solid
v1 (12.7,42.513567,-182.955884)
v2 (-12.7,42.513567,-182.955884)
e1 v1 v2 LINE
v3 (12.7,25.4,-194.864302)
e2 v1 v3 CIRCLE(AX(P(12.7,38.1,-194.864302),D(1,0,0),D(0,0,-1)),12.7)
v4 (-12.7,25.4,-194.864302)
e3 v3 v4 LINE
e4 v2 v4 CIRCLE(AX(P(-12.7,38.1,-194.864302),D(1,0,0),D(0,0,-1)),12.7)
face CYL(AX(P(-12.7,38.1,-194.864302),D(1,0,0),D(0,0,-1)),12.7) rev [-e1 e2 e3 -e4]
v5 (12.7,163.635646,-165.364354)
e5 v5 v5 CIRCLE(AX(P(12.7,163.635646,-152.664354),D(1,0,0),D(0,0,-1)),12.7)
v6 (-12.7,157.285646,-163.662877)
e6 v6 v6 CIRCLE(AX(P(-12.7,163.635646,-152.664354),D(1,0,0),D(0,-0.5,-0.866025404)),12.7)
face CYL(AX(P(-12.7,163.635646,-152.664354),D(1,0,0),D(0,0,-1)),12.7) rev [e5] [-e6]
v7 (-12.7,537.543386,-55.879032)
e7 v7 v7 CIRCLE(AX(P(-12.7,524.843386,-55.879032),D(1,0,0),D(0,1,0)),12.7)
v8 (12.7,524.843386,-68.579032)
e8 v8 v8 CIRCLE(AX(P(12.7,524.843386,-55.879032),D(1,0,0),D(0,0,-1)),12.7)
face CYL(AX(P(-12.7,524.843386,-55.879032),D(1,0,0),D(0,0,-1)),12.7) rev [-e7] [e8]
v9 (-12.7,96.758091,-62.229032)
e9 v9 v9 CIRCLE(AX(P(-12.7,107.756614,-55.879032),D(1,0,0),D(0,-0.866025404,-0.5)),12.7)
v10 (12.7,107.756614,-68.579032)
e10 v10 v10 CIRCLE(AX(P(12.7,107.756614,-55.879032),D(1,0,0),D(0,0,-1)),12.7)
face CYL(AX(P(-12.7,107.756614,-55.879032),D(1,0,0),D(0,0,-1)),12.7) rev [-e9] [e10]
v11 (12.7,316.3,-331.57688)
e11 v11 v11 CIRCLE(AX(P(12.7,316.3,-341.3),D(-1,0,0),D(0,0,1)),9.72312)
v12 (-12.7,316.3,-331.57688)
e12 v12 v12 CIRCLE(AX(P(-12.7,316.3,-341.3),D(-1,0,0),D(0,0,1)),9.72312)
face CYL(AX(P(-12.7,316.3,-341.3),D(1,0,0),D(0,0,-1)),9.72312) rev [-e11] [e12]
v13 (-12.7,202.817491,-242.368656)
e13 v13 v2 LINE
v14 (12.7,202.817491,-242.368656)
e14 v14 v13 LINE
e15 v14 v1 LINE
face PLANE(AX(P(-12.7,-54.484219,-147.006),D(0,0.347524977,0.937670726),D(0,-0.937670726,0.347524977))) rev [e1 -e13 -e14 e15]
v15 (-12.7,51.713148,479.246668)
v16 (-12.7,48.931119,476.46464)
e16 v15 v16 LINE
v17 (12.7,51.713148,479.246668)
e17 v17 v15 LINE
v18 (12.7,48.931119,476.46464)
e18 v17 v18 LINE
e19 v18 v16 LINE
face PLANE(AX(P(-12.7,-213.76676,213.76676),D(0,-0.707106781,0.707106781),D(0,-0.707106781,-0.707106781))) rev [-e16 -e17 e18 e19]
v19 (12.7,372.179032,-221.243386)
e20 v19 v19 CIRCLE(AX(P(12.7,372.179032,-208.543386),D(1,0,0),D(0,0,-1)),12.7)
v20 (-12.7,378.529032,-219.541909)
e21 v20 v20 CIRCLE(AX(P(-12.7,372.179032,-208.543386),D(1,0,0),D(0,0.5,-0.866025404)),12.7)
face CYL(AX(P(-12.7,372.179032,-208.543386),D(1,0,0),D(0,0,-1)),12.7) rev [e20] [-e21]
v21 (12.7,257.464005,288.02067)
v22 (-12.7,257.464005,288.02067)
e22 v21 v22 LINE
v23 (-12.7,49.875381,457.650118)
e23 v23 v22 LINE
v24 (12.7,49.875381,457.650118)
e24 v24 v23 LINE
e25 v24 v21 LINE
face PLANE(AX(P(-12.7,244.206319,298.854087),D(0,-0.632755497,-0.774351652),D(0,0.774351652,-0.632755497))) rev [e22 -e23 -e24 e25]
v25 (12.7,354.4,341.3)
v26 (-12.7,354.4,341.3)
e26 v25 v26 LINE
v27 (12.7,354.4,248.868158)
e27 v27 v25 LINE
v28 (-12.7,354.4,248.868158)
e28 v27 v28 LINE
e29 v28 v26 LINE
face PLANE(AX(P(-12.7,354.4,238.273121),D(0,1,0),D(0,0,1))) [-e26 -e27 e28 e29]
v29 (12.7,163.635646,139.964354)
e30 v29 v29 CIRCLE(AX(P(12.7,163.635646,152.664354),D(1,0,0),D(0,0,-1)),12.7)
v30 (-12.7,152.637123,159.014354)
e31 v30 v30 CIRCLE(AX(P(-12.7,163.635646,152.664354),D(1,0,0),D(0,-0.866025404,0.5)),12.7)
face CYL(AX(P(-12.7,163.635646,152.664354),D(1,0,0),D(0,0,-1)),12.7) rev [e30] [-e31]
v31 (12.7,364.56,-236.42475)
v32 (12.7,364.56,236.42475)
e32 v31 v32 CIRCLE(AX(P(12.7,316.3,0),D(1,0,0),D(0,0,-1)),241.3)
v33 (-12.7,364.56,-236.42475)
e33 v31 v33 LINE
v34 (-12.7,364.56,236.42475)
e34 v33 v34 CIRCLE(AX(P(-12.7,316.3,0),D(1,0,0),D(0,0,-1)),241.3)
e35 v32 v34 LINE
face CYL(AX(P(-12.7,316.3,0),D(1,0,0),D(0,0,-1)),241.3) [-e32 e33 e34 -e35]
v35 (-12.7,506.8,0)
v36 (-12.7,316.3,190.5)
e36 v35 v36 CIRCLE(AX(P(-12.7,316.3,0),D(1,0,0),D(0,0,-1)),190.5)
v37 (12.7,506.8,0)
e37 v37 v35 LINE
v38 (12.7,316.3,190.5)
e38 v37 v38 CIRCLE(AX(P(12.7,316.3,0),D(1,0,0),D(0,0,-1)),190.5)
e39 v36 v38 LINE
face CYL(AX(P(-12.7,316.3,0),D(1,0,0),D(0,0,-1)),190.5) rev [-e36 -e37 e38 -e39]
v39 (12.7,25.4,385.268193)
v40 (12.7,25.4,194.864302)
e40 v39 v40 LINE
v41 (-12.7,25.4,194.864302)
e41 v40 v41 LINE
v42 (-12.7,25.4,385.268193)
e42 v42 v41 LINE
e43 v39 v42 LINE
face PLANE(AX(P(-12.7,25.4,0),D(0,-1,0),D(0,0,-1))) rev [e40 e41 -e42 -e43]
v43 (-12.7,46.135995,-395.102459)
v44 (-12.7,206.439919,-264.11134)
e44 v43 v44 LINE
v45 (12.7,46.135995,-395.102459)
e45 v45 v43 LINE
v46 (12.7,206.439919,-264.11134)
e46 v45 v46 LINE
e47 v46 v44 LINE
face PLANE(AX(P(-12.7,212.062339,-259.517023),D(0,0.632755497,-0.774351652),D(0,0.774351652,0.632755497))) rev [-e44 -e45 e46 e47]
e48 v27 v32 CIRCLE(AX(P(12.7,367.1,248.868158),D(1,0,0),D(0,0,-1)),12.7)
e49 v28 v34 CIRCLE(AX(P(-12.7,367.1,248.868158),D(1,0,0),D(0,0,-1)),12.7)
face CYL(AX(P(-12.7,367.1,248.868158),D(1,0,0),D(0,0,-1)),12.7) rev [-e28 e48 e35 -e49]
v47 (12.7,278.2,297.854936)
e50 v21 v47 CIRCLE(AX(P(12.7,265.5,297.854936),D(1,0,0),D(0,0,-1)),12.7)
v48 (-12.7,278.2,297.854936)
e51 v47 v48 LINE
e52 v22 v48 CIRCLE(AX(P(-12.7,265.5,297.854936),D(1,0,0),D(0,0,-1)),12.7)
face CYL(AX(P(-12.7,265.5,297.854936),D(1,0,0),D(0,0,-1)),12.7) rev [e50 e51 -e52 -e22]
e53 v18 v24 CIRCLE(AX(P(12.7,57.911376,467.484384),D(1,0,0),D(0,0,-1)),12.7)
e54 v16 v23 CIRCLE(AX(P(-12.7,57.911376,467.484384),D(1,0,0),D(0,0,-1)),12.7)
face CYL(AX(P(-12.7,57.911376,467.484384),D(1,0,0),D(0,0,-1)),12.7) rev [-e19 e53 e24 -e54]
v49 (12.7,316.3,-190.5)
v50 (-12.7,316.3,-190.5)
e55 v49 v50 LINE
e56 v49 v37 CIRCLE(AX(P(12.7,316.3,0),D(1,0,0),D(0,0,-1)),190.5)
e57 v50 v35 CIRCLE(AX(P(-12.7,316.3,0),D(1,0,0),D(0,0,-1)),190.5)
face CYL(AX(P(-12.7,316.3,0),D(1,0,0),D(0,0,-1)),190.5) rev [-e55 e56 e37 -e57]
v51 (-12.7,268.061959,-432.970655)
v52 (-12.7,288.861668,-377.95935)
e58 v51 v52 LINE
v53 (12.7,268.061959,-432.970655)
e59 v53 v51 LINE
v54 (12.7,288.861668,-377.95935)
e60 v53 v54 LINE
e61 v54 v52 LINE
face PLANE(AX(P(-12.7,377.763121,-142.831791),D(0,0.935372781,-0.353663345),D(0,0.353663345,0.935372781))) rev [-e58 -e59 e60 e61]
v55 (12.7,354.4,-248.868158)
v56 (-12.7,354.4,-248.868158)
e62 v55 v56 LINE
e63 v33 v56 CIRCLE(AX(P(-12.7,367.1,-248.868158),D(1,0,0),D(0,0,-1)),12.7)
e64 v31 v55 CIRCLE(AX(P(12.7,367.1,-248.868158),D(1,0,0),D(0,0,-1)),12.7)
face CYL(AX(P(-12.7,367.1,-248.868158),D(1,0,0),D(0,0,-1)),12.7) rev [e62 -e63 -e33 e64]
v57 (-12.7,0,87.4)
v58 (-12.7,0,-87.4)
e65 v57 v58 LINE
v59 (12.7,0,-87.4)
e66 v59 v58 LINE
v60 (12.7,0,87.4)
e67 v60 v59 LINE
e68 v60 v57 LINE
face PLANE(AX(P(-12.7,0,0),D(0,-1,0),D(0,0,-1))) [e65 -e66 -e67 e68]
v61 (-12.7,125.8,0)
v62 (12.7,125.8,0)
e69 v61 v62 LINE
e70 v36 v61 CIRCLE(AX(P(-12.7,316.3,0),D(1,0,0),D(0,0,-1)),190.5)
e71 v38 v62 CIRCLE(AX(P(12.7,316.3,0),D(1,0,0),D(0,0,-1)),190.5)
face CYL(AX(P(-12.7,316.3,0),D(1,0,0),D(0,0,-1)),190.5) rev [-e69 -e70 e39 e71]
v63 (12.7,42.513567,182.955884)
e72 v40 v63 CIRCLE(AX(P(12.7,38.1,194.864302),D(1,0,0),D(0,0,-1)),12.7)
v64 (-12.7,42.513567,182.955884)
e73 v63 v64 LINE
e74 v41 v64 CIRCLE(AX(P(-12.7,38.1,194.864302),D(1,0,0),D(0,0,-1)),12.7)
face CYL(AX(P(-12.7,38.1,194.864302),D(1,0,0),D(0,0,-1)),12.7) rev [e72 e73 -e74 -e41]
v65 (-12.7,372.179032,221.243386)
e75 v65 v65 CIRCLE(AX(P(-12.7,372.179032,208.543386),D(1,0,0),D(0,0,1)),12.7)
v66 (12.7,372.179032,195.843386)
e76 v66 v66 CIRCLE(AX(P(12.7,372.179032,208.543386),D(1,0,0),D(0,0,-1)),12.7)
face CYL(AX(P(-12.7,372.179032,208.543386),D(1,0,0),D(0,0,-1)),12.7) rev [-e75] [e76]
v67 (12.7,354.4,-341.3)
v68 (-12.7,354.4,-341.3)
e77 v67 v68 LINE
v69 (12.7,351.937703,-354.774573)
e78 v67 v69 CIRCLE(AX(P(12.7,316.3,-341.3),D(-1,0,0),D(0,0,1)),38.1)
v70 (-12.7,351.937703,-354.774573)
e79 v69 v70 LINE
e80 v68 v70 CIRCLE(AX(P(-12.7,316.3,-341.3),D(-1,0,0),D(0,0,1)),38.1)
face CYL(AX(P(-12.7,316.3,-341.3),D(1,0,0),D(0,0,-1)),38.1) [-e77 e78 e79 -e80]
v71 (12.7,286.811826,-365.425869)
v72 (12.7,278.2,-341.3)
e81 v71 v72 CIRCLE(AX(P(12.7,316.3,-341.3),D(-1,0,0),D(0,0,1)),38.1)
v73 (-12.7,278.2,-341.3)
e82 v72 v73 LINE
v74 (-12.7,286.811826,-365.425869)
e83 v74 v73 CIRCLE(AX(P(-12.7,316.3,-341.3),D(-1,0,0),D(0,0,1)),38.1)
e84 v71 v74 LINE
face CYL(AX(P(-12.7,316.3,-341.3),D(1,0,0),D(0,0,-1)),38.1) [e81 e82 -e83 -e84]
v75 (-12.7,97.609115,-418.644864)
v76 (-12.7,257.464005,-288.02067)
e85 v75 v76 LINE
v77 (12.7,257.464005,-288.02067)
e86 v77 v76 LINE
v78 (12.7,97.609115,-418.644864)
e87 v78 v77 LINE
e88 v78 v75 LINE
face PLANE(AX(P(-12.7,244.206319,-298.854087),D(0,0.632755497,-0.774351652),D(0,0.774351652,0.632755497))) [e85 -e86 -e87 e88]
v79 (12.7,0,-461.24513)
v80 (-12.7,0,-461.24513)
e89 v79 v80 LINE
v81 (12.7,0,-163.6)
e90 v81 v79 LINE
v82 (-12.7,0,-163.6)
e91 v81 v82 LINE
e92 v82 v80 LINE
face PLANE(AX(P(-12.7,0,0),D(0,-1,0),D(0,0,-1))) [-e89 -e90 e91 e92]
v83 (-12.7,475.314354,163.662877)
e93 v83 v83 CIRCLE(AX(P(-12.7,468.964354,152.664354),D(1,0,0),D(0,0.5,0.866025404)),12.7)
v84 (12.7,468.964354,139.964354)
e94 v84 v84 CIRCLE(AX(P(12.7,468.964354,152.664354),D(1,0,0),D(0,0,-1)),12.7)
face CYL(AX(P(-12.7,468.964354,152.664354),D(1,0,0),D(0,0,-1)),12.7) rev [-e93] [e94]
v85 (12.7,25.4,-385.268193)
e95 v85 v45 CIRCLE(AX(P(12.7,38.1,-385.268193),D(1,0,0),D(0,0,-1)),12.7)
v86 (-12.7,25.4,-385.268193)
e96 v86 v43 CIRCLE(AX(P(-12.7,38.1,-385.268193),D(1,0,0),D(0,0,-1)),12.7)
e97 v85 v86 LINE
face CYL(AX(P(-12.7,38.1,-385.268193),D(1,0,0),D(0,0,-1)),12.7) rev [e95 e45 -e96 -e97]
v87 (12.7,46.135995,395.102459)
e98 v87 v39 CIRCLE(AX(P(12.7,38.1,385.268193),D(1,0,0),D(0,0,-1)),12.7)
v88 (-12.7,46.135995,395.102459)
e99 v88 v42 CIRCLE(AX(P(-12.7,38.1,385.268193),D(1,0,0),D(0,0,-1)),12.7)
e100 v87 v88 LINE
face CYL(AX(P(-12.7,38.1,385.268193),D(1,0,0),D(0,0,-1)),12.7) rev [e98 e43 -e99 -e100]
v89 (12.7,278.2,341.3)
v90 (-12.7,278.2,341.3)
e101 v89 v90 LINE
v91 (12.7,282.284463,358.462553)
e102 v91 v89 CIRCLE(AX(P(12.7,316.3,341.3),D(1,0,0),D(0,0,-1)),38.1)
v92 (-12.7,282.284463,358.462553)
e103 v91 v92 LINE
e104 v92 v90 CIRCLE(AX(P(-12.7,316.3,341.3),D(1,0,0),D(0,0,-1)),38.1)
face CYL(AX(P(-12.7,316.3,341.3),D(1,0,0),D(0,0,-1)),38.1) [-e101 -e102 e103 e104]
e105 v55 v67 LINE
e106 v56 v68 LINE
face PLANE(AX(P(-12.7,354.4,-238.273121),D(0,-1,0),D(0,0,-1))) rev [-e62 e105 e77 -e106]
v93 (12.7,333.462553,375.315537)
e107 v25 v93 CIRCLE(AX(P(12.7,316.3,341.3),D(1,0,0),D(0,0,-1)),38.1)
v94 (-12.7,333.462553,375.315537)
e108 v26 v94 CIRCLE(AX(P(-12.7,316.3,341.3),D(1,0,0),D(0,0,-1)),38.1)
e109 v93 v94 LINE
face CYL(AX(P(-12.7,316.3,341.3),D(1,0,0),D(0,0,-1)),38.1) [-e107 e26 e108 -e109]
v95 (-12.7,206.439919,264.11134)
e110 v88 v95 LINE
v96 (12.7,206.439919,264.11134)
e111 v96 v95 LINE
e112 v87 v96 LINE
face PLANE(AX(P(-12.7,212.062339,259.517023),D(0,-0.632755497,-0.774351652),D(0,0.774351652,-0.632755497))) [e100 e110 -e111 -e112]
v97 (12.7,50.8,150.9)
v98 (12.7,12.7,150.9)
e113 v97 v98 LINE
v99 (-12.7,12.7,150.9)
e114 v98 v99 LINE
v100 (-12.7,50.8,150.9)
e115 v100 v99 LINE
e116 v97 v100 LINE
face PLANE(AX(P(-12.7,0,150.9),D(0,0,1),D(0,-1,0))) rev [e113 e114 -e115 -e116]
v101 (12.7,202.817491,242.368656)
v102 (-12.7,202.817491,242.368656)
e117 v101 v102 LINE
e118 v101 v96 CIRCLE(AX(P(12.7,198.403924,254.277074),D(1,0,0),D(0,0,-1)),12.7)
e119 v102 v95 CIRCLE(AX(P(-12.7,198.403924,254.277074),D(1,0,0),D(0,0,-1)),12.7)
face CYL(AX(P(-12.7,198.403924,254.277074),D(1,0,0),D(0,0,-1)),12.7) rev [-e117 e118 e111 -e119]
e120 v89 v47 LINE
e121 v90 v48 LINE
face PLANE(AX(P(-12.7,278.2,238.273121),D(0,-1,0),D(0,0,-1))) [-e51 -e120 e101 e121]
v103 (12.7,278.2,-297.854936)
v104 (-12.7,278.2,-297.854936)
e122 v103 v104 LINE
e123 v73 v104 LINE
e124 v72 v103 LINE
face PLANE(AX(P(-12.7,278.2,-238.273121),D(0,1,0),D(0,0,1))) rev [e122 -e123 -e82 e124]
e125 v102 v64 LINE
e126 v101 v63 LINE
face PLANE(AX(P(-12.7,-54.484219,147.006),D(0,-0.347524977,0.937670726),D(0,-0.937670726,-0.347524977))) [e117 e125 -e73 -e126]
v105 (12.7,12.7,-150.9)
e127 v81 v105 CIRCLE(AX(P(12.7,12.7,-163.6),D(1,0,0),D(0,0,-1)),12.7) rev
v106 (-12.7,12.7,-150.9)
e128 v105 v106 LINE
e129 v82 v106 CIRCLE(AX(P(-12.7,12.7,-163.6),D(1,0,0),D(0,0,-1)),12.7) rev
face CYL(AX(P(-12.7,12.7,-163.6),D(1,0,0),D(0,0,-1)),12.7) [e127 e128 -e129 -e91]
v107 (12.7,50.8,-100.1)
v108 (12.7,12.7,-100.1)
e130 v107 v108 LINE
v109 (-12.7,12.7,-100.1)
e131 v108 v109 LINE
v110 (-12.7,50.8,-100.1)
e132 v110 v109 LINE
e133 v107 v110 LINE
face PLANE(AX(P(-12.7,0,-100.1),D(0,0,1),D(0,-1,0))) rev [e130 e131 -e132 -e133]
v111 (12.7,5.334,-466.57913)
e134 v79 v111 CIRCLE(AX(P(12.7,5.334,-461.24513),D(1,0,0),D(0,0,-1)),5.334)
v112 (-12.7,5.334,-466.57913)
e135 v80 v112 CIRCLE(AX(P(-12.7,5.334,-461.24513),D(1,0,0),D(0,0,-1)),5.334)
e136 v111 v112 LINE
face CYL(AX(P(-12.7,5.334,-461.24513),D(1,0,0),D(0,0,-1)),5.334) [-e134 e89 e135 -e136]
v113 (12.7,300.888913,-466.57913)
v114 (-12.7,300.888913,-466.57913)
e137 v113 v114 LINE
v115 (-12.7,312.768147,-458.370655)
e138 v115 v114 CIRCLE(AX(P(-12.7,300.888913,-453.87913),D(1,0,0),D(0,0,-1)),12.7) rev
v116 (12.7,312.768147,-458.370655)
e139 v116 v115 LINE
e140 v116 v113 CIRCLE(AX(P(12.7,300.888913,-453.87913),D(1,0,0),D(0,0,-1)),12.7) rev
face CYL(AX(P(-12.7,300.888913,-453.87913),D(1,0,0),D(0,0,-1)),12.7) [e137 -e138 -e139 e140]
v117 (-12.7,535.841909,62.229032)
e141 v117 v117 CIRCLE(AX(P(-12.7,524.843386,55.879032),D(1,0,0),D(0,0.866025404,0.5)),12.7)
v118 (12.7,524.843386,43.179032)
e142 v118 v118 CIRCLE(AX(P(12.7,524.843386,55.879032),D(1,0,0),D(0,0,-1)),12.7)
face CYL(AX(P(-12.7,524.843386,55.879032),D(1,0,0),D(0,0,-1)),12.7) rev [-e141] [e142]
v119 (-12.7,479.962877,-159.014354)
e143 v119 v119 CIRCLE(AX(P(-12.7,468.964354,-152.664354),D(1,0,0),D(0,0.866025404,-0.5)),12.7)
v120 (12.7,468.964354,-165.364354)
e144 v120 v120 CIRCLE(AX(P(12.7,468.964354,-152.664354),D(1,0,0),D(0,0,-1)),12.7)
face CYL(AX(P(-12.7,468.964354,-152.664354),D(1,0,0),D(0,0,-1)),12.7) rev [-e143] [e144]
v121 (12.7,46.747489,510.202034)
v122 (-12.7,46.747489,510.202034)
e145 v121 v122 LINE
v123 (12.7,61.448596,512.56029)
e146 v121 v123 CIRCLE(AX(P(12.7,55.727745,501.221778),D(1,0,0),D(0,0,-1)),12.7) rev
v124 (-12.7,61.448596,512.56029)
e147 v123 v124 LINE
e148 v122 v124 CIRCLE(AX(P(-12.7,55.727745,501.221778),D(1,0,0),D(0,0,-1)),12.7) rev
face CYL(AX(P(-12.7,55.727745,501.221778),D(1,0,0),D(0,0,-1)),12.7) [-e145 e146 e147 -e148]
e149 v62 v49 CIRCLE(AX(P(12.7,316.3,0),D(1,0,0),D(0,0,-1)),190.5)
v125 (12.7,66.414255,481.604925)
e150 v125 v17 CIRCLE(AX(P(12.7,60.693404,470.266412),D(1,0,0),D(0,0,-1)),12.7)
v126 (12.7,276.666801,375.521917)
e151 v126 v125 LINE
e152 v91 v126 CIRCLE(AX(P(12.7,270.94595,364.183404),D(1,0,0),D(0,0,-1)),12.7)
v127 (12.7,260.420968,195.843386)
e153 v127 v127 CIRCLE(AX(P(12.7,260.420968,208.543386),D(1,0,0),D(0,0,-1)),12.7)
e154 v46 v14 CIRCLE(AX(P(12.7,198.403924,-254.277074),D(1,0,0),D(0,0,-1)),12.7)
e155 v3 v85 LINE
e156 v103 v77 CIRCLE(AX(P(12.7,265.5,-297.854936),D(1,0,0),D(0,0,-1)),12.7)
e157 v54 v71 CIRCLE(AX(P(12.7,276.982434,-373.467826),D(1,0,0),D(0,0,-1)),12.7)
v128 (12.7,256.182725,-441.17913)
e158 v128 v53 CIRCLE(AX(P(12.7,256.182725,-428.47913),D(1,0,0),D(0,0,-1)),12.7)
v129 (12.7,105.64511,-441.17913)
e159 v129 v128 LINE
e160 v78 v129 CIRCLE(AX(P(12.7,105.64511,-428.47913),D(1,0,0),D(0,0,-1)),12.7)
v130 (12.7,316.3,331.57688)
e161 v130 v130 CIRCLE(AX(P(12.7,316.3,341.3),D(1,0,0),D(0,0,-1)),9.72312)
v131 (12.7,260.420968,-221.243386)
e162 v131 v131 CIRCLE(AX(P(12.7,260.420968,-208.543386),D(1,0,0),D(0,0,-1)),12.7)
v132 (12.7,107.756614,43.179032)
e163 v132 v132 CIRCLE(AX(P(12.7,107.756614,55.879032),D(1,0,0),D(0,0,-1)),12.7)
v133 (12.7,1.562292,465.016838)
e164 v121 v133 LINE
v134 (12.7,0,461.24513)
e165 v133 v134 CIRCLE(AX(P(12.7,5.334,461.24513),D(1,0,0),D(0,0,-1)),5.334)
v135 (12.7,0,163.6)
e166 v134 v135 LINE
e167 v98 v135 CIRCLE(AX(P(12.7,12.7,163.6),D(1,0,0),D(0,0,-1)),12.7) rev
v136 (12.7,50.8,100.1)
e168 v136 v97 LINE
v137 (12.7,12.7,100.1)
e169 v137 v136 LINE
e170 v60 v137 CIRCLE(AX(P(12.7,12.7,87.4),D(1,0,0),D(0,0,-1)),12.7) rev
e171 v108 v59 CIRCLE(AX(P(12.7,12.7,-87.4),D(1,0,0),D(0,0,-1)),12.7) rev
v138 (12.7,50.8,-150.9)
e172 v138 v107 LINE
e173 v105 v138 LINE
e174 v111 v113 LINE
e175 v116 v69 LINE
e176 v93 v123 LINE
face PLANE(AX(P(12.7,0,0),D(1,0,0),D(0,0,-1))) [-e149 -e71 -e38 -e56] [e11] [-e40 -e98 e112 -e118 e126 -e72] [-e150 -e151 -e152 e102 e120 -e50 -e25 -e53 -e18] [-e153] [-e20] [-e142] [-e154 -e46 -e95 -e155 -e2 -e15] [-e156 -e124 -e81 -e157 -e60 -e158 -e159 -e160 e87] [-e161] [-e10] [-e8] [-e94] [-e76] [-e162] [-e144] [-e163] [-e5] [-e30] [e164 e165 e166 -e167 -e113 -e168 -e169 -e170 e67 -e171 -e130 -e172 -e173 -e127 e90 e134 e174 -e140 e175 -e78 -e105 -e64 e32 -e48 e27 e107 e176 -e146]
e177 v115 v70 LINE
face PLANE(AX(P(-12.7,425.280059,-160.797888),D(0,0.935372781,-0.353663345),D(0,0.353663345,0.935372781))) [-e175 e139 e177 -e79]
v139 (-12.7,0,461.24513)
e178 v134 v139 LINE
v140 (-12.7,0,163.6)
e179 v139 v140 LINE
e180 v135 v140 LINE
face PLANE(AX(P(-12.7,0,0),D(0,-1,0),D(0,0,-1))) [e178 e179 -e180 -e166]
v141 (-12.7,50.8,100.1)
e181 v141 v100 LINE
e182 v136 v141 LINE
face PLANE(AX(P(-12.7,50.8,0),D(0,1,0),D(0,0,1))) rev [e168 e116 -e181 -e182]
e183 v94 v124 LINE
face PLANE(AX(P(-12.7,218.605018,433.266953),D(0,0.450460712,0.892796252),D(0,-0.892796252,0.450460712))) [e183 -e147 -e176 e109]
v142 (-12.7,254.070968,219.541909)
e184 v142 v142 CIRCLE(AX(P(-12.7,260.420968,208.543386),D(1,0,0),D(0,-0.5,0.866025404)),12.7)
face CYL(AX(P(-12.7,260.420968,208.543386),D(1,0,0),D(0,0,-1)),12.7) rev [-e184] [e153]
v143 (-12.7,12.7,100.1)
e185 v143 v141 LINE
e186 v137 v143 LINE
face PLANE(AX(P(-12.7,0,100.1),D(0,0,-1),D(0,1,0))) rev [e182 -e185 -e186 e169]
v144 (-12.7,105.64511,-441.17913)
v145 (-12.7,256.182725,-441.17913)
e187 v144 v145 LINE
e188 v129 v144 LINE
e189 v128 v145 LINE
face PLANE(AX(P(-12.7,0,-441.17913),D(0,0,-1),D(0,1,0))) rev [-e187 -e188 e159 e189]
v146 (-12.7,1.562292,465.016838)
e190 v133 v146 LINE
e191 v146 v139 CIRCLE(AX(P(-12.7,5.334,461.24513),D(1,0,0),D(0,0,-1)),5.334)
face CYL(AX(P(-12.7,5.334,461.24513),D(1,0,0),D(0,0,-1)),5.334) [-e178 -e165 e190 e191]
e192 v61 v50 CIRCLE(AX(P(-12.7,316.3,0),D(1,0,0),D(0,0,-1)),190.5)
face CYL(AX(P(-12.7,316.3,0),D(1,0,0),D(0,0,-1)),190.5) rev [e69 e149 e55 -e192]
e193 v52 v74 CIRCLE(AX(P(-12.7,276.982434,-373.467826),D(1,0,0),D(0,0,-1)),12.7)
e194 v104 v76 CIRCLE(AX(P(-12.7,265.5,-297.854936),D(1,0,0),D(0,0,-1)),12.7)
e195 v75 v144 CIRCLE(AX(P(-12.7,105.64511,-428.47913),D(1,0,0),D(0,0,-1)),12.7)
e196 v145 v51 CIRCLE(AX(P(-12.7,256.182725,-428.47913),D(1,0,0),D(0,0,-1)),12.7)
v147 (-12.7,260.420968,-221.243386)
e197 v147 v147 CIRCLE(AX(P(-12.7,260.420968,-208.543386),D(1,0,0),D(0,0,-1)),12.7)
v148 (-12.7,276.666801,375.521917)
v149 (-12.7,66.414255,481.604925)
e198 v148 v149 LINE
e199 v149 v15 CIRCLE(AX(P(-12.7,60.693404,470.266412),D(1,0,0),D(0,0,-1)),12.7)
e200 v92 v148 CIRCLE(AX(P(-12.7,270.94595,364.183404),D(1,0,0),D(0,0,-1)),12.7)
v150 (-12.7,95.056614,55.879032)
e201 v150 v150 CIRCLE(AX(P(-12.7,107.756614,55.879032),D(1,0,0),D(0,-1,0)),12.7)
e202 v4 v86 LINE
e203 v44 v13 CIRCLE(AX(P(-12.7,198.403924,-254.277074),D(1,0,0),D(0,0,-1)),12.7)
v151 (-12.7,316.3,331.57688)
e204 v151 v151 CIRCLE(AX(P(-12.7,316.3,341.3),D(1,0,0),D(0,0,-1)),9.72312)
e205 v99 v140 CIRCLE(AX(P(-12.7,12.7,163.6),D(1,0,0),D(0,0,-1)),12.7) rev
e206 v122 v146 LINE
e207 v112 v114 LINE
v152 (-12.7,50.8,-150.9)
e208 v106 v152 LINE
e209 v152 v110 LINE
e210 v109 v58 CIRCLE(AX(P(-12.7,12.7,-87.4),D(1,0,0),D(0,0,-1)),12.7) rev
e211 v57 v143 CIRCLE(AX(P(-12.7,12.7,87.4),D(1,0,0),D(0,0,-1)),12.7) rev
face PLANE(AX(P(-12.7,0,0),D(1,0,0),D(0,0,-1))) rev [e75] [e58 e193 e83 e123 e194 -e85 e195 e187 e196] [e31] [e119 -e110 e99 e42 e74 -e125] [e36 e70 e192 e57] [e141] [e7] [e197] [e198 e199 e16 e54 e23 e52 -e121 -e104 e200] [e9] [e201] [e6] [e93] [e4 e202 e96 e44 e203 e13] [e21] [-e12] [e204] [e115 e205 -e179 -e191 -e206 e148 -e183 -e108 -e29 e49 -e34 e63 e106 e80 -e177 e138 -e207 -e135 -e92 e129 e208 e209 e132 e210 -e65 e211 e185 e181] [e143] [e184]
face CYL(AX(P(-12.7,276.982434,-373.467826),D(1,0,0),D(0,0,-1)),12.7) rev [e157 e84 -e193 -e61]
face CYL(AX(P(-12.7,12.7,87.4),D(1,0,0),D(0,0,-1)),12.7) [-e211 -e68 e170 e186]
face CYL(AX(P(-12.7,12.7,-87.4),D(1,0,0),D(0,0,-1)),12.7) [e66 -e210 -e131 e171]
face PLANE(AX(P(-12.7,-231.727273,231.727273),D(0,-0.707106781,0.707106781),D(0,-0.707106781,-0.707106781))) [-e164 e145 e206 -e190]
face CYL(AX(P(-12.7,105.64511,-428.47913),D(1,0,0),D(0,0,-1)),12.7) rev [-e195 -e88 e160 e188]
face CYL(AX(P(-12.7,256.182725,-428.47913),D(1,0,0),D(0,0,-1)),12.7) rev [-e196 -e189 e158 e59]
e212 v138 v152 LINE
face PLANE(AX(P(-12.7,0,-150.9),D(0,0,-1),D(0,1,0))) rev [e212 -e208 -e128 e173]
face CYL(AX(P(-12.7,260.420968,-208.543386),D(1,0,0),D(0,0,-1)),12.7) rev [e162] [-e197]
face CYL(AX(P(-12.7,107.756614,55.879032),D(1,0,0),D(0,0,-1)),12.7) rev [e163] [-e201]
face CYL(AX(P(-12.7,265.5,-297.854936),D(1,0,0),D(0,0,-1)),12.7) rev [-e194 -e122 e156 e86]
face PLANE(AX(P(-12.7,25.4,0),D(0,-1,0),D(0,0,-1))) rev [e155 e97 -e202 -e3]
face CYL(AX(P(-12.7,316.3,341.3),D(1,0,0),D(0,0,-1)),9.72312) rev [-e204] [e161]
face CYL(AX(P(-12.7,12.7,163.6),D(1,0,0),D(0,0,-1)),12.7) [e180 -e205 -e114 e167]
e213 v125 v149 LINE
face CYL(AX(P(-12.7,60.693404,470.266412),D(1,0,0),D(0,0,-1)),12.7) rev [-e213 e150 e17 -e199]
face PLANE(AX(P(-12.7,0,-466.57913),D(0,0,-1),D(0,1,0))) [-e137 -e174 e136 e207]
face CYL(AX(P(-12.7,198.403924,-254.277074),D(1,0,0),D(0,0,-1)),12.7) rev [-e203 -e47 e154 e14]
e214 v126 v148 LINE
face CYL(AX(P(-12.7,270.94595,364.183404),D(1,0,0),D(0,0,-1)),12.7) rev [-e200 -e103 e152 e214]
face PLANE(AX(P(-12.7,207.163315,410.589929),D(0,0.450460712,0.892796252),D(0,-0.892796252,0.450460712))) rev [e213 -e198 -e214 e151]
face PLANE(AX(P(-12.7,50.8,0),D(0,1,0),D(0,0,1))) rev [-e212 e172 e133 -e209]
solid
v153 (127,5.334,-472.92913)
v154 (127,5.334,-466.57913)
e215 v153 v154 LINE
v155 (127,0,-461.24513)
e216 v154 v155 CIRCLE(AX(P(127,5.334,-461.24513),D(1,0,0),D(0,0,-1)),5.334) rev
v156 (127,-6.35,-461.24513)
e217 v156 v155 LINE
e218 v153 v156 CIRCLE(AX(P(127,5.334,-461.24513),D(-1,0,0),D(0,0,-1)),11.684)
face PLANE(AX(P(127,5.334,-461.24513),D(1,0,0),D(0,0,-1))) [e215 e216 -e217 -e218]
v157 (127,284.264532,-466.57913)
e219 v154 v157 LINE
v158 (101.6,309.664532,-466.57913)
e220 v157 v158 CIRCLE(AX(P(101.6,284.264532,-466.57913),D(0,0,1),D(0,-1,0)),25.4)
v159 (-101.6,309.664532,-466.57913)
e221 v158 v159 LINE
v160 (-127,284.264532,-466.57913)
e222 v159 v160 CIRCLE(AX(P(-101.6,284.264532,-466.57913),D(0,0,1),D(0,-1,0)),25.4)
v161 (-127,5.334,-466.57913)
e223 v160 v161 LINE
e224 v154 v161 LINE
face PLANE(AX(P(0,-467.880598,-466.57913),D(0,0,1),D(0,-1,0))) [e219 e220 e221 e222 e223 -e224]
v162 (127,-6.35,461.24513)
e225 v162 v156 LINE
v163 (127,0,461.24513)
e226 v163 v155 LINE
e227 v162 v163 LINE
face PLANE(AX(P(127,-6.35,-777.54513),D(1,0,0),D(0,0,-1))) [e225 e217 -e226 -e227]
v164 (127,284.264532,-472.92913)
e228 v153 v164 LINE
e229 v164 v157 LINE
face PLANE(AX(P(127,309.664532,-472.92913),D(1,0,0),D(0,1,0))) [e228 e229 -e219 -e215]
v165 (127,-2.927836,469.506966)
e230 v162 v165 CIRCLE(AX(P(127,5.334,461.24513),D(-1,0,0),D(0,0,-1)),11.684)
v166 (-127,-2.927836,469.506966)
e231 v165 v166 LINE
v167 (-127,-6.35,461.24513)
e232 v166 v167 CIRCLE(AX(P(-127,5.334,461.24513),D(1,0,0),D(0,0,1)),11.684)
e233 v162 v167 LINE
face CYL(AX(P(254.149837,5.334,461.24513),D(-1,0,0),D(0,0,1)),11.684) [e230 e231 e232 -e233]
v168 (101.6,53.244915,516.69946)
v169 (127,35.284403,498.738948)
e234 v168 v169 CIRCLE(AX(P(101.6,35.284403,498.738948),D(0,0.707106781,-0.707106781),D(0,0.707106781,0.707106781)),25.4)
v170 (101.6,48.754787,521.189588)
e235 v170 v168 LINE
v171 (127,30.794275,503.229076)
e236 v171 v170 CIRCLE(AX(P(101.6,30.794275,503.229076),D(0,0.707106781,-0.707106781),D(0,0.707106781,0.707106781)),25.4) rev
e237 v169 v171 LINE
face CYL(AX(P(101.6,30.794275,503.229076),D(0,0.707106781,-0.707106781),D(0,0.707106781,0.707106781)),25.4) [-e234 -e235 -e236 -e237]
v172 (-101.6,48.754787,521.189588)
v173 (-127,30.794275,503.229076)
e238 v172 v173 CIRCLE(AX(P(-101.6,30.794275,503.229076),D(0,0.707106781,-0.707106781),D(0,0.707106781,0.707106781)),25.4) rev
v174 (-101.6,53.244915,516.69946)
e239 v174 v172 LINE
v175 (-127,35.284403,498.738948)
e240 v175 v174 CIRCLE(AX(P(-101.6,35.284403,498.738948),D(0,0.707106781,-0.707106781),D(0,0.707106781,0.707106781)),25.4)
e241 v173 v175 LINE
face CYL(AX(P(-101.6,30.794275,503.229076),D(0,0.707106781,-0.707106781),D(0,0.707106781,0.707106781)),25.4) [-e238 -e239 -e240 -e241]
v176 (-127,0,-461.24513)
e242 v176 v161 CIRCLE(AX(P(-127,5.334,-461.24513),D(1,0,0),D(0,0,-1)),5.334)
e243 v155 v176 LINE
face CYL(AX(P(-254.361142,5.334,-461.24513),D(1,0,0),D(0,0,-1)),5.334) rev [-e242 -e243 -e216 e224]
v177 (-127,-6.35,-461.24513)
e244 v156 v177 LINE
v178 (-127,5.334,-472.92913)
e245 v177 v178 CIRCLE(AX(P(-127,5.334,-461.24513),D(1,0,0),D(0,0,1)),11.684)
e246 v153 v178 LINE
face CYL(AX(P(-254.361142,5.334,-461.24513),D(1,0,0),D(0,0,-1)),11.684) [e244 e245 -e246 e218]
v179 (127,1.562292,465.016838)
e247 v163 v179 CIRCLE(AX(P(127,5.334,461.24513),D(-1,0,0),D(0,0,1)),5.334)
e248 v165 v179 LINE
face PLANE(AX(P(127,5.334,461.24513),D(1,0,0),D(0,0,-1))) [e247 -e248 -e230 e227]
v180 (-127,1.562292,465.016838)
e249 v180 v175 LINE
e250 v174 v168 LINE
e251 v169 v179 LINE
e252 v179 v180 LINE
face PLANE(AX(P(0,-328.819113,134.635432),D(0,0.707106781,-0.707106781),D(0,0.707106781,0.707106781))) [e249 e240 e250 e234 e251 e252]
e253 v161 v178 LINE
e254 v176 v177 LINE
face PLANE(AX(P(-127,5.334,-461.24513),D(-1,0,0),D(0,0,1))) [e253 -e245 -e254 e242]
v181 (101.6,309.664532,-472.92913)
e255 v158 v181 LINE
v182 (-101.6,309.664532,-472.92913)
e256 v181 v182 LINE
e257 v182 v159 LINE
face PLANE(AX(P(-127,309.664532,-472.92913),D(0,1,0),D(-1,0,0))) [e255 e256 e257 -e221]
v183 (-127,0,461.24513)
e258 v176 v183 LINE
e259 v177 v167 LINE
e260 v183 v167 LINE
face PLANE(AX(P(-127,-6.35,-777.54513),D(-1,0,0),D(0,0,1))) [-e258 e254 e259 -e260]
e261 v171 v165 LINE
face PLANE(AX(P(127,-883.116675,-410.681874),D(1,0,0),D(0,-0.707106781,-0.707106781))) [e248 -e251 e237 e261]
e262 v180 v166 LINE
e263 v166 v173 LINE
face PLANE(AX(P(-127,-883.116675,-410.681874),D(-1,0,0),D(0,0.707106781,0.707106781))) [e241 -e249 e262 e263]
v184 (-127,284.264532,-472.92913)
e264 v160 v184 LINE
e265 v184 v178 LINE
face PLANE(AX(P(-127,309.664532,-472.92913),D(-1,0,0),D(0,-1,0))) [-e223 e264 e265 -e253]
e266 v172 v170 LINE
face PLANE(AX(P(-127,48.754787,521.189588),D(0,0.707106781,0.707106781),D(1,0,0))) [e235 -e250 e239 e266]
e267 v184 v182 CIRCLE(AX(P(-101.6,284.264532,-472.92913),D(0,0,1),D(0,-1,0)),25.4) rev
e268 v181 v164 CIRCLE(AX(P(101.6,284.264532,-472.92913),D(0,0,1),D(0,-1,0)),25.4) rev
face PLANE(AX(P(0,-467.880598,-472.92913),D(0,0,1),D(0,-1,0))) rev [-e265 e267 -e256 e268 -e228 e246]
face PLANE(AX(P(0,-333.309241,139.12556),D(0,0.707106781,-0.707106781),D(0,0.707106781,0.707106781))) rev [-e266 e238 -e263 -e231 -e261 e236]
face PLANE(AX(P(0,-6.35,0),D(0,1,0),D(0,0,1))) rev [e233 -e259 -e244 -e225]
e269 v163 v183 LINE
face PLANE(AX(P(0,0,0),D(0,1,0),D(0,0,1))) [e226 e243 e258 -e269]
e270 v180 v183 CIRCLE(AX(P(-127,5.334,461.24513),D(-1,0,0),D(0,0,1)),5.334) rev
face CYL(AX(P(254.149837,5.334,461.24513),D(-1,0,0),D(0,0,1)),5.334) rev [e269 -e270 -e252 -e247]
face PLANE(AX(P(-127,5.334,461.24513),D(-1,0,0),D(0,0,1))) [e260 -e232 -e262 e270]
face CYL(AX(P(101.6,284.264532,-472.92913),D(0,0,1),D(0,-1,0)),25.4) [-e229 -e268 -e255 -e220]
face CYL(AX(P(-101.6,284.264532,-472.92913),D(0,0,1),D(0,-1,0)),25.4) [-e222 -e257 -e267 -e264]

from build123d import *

# Parameters (mm, degrees)
FLANGE_PROFILE_DEPTH                = 12.7
F_7_8_1_DIAMETER_HOLE1_D            = 25.4
BOLT_PATTERN_COUNT                  = 12
SKETCH15_R                          = 9.72312
BOSS_EXTRUDE1_DEPTH                 = 12.7
SKETCH5_W                           = 254
SKETCH5_H                           = 1317.865260112
BASE_SKID_DEPTH                     = 6.35
BEND_START                          = -127
BEND_HEEL_DEPTH                     = 254
BEND_HEEL_2_DEPTH                   = 254
BEND_TOE_DEPTH                      = 254
BEND_TOE_2_DEPTH                    = 254
WEBBING_EXTRUDE_DEPTH               = 12.7
WEBBING_FILLET_R                    = 12.7
SKID_START                          = -472.929130056
SKID_EDGES_DEPTH                    = 6.35
SKID_START_2                        = -334.061851681
SKID_EDGES_2_DEPTH                  = 6.35
FLANGE_FILLET_R                     = 12.7
CONVERT_START                       = -12.7
CONVERT_FLANGE_TO_SHEET_OUTLINE_R   = 12.7
CONVERT_FLANGE_TO_SHEET_OUTLINE_R_2 = 9.72312
CONVERT_FLANGE_TO_SHEET_OUTLINE_R_3 = 190.5
CONVERT_FLANGE_TO_SHEET_DEPTH       = 25.4


# Read off the part's stored shape, not the designer's step: Bend Heel, Bend Toe, Skid Edges, Convert Flange to Sheet
# Sheet-metal steps are written as plain solids
with BuildPart() as part:
    # Sketch1 → Flange Profile (new, symmetric)
    with BuildSketch(Plane(origin=(0, 0, 0), x_dir=(0, 0, -1), z_dir=(1, 0, 0))):
        with BuildLine():
            ThreePointArc((-190.5, 316.3), (0, 506.8), (190.5, 316.3))
            Line((190.5, 316.3), (241.3, 316.3))
            ThreePointArc((241.3, 316.3), (0, 557.6), (-241.3, 316.3))
            Line((-241.3, 316.3), (-190.5, 316.3))
        make_face()
        with BuildLine():
            Line((241.3, 316.3), (190.5, 316.3))
            ThreePointArc((190.5, 316.3), (0, 125.8), (-190.5, 316.3))
            Line((-190.5, 316.3), (-241.3, 316.3))
            ThreePointArc((-241.3, 316.3), (0, 75), (241.3, 316.3))
        make_face()
    extrude(amount=FLANGE_PROFILE_DEPTH, both=True)

    # 7/8 (1) Diameter Hole1 (through all)
    with Locations(Plane(origin=(12.7, 260.420968162, -208.543385896), x_dir=(0, 0, 1), z_dir=(1, 0, 0))):
        with Locations((0, 0)):
            f_7_8_1_diameter_hole1 = Hole(F_7_8_1_DIAMETER_HOLE1_D / 2)

    # Bolt Pattern: 7/8 (1) Diameter Hole1 ×12 about axis
    bolt_pattern_axis = Axis((0, 316.3, 0), (1, 0, 0))
    for i in range(1, BOLT_PATTERN_COUNT):
        add(f_7_8_1_diameter_hole1.rotate(bolt_pattern_axis, i * 360 / BOLT_PATTERN_COUNT), mode=Mode.SUBTRACT)

    # Sketch15 → Boss-Extrude1 (add, symmetric)
    with BuildSketch(Plane(origin=(0, 0, 0), x_dir=(0, 0, -1), z_dir=(1, 0, 0))):
        with BuildLine():
            Line((-238.273120599, 278.2), (-341.3, 278.2))
            ThreePointArc((-341.3, 278.2), (-379.4, 316.3), (-341.3, 354.4))
            Line((-341.3, 354.4), (-238.273120599, 354.4))
            ThreePointArc((-238.273120599, 354.4), (-200.173120599, 316.3), (-238.273120599, 278.2))
        make_face()
        with Locations((-341.3, 316.3)):
            Circle(SKETCH15_R, mode=Mode.SUBTRACT)
    boss_extrude1 = extrude(amount=BOSS_EXTRUDE1_DEPTH, both=True)

    # Mirror2: Boss-Extrude1 across plane
    add(boss_extrude1.mirror(Plane.XY))

    # webbing → Webbing Extrude (add, symmetric)
    with BuildSketch(Plane(origin=(0, 0, 0), x_dir=(0, 0, -1), z_dir=(1, 0, 0))):
        with BuildLine():
            ThreePointArc((238.273120599, 278.2), (0, 75), (-238.273120599, 278.2))
            Line((-238.273120599, 278.2), (-271.07641131, 278.2))
            Line((-271.07641131, 278.2), (-466.535353829, 39.001833116))
            Line((-466.535353829, 39.001833116), (-485.744094857, 58.210574144))
            Line((-485.744094857, 58.210574144), (-380.664844281, 266.473711409))
            Line((-380.664844281, 266.473711409), (-368.819522655, 289.950695021))
            ThreePointArc((-368.819522655, 289.950695021), (-378.982374479, 310.674286388), (-375.315537192, 333.462553119))
            Line((-375.315537192, 333.462553119), (-516.69946035, 53.244915153))
            Line((-516.69946035, 53.244915153), (-465.016837626, 1.562292429))
            ThreePointArc((-465.016837626, 1.562292429), (-463.286363484, 0.406026574), (-461.245130056, 0))
            Line((-461.245130056, 0), (-150.9, 0))
            Line((-150.9, 0), (-150.9, 50.8))
            Line((-150.9, 50.8), (-100.1, 50.8))
            Line((-100.1, 50.8), (-100.1, 0))
            Line((-100.1, 0), (100.1, 0))
            Line((100.1, 0), (100.1, 50.8))
            Line((100.1, 50.8), (150.9, 50.8))
            Line((150.9, 50.8), (150.9, 0))
            Line((150.9, 0), (461.245130056, 0))
            ThreePointArc((461.245130056, 0), (465.016837626, 1.562292429), (466.579130056, 5.334))
            Line((466.579130056, 5.334), (466.579130056, 309.66453199))
            Line((466.579130056, 309.66453199), (354.774573435, 351.937702939))
            ThreePointArc((354.774573435, 351.937702939), (378.177611201, 325.873494246), (370.408024073, 291.716816021))
            Line((370.408024073, 291.716816021), (441.179130056, 264.958344347))
            Line((441.179130056, 264.958344347), (441.179130056, 70.03219769))
            Line((441.179130056, 70.03219769), (271.07641131, 278.2))
            Line((271.07641131, 278.2), (238.273120599, 278.2))
        make_face()
        Polygon((-176.613153751, 25.4), (-412.046717792, 25.4), (-250.076782577, 223.615088522), align=None, mode=Mode.SUBTRACT)
        Polygon((250.076782577, 223.615088522), (412.046717792, 25.4), (176.613153751, 25.4), align=None, mode=Mode.SUBTRACT)
    extrude(amount=WEBBING_EXTRUDE_DEPTH, both=True)

    # Webbing Fillet
    webbing_fillet_edges = [part.edges().sort_by_distance(p)[0] for p in [
        (0, 223.615088522, 250.076782577),
        (0, 25.4, -412.046717792),
        (0, 25.4, -176.613153751),
        (0, 289.950695021, 368.819522655),
        (0, 291.716816021, -370.408024073),
        (0, 264.958344347, -441.179130056),
        (0, 70.03219769, -441.179130056),
        (0, 278.2, -271.07641131),
        (0, 278.2, 271.07641131),
        (0, 39.001833116, 466.535353829),
        (0, 223.615088522, -250.076782577),
        (0, 58.210574144, 485.744094857),
        (0, 25.4, 176.613153751),
        (0, 25.4, 412.046717792),
    ]]
    fillet(webbing_fillet_edges, radius=WEBBING_FILLET_R)

    # Flange Fillet
    flange_fillet_edges = [part.edges().sort_by_distance(p)[0] for p in [
        (0, 53.244915153, 516.69946035),
        (0, 0, 150.9),
        (0, 0, 100.1),
        (0, 0, -100.1),
        (0, 0, -150.9),
        (0, 309.66453199, -466.579130056),
        (0, 354.4, 238.273120599),
        (0, 354.4, -238.273120599),
    ]]
    fillet(flange_fillet_edges, radius=FLANGE_FILLET_R)


with BuildPart() as body_2:
    # Sketch5 → Base Skid (new body)
    with BuildSketch(Plane(origin=(0, 0, 0), x_dir=(1, 0, 0), z_dir=(0, 1, 0))):
        with Locations((0, 118.6125)):
            Rectangle(SKETCH5_W, SKETCH5_H)
    extrude(amount=-BASE_SKID_DEPTH)

    # Bend Heel outline → Bend Heel (cut)
    with BuildSketch(Plane.YZ.offset(BEND_START)):
        with BuildLine():
            Line((0, -777.545130056), (0, -471.640528076))
            ThreePointArc((0, -471.640528076), (-4.636915504, -467.33583609), (-6.35, -461.245130056))
            Line((-6.35, -461.245130056), (-6.35, -777.545130056))
            Line((-6.35, -777.545130056), (0, -777.545130056))
        make_face()
    extrude(amount=BEND_HEEL_DEPTH, mode=Mode.SUBTRACT)

    # Bend Heel 2 outline → Bend Heel 2 (add)
    with BuildSketch(Plane.YZ.offset(BEND_START)):
        with BuildLine():
            Line((5.334, -472.929130056), (309.66453199, -472.929130056))
            Line((309.66453199, -472.929130056), (309.66453199, -466.579130056))
            Line((309.66453199, -466.579130056), (5.334, -466.579130056))
            ThreePointArc((5.334, -466.579130056), (1.56229243, -465.016837626), (0, -461.245130056))
            Line((0, -461.245130056), (0, -471.640528076))
            ThreePointArc((0, -471.640528076), (2.590277571, -472.602411563), (5.334, -472.929130056))
        make_face()
    extrude(amount=BEND_HEEL_2_DEPTH)

    # Bend Toe outline → Bend Toe (cut)
    with BuildSketch(Plane.YZ.offset(BEND_START)):
        with BuildLine():
            Line((-6.35, 540.320130056), (-6.35, 461.245130056))
            ThreePointArc((-6.35, 461.245130056), (-5.460608458, 465.71640328), (-2.927835631, 469.506965687))
            Line((-2.927835631, 469.506965687), (0, 472.434801318))
            Line((0, 472.434801318), (0, 540.320130056))
            Line((0, 540.320130056), (-6.35, 540.320130056))
        make_face()
    extrude(amount=BEND_TOE_DEPTH, mode=Mode.SUBTRACT)

    # Bend Toe 2 outline → Bend Toe 2 (add)
    with BuildSketch(Plane.YZ.offset(BEND_START)):
        with BuildLine():
            Line((48.754787092, 521.189588411), (0, 472.434801318))
            Line((0, 472.434801318), (0, 461.245130056))
            ThreePointArc((0, 461.245130056), (0.406026574, 463.286363484), (1.562292429, 465.016837626))
            Line((1.562292429, 465.016837626), (53.244915153, 516.69946035))
            Line((53.244915153, 516.69946035), (48.754787092, 521.189588411))
        make_face()
    extrude(amount=BEND_TOE_2_DEPTH)

    # Skid Edges outline → Skid Edges (cut)
    with BuildSketch(Plane.XY.offset(SKID_START)):
        with BuildLine():
            ThreePointArc((-127, 284.26453199), (-119.560512242, 302.225044232), (-101.6, 309.66453199))
            Line((-101.6, 309.66453199), (-127, 309.66453199))
            Line((-127, 309.66453199), (-127, 284.26453199))
        make_face()
        with BuildLine():
            ThreePointArc((101.6, 309.66453199), (119.560512242, 302.225044232), (127, 284.26453199))
            Line((127, 284.26453199), (127, 309.66453199))
            Line((127, 309.66453199), (101.6, 309.66453199))
        make_face()
    extrude(amount=SKID_EDGES_DEPTH, mode=Mode.SUBTRACT)

    # Skid Edges 2 outline → Skid Edges 2 (cut)
    with BuildSketch(Plane(origin=(0, 0, 0), x_dir=(1, 0, 0), z_dir=(0, 0.707106781186546, -0.707106781186549)).offset(SKID_START_2)):
        with BuildLine():
            Line((-127, -403.011532817), (-101.6, -403.011532817))
            ThreePointArc((-101.6, -403.011532817), (-119.560512242, -395.572045059), (-127, -377.611532817))
            Line((-127, -377.611532817), (-127, -403.011532817))
        make_face()
        with BuildLine():
            ThreePointArc((127, -377.611532817), (119.560512242, -395.572045059), (101.6, -403.011532817))
            Line((101.6, -403.011532817), (127, -403.011532817))
            Line((127, -403.011532817), (127, -377.611532817))
        make_face()
    extrude(amount=SKID_EDGES_2_DEPTH, mode=Mode.SUBTRACT)


with BuildPart() as body_3:
    # Convert Flange to Sheet outline → Convert Flange to Sheet (new body)
    with BuildSketch(Plane.YZ.offset(CONVERT_START)):
        with BuildLine():
            ThreePointArc((354.4, 341.3), (348.746134391, 361.271438683), (333.462553119, 375.315537192))
            Line((333.462553119, 375.315537192), (61.448595688, 512.560290001))
            ThreePointArc((61.448595688, 512.560290001), (53.716209529, 513.761463663), (46.747488527, 510.202033725))
            Line((46.747488527, 510.202033725), (1.562292429, 465.016837626))
            ThreePointArc((1.562292429, 465.016837626), (0.406026574, 463.286363484), (0, 461.245130056))
            Line((0, 461.245130056), (0, 163.6))
            ThreePointArc((0, 163.6), (3.719743879, 154.619743879), (12.7, 150.9))
            Line((12.7, 150.9), (50.8, 150.9))
            Line((50.8, 150.9), (50.8, 100.1))
            Line((50.8, 100.1), (12.7, 100.1))
            ThreePointArc((12.7, 100.1), (3.719743879, 96.380256121), (0, 87.4))
            Line((0, 87.4), (0, -87.4))
            ThreePointArc((0, -87.4), (3.719743879, -96.380256121), (12.7, -100.1))
            Line((12.7, -100.1), (50.8, -100.1))
            Line((50.8, -100.1), (50.8, -150.9))
            Line((50.8, -150.9), (12.7, -150.9))
            ThreePointArc((12.7, -150.9), (3.719743879, -154.619743879), (0, -163.6))
            Line((0, -163.6), (0, -461.245130056))
            ThreePointArc((0, -461.245130056), (1.56229243, -465.016837626), (5.334, -466.579130056))
            Line((5.334, -466.579130056), (300.888912587, -466.579130056))
            ThreePointArc((300.888912587, -466.579130056), (308.108595375, -464.327392133), (312.7681469, -458.370654534))
            Line((312.7681469, -458.370654534), (351.937702939, -354.774573435))
            ThreePointArc((351.937702939, -354.774573435), (353.779370872, -348.148850927), (354.4, -341.3))
            Line((354.4, -341.3), (354.4, -248.868157867))
            ThreePointArc((354.4, -248.868157867), (357.262622301, -240.83597261), (364.56, -236.424749973))
            ThreePointArc((364.56, -236.424749973), (557.6, 0), (364.56, 236.424749973))
            ThreePointArc((364.56, 236.424749973), (357.262622301, 240.83597261), (354.4, 248.868157867))
            Line((354.4, 248.868157867), (354.4, 341.3))
        make_face()
        with BuildLine():
            ThreePointArc((46.135994814, -395.102459099), (32.65790179, -396.74310345), (25.4, -385.26819312))
            Line((25.4, -385.26819312), (25.4, -194.864301774))
            ThreePointArc((25.4, -194.864301774), (30.846114958, -184.439756133), (42.513567213, -182.955883556))
            Line((42.513567213, -182.955883556), (202.817491303, -242.368656148))
            ThreePointArc((202.817491303, -242.368656148), (210.931253322, -252.189965766), (206.439918904, -264.111340345))
            Line((206.439918904, -264.111340345), (46.135994814, -395.102459099))
        make_face(mode=Mode.SUBTRACT)
        with BuildLine():
            ThreePointArc((257.464005186, -288.020670003), (270.94209821, -286.380025652), (278.2, -297.854935982))
            Line((278.2, -297.854935982), (278.2, -341.3))
            ThreePointArc((278.2, -341.3), (280.417487243, -354.108406547), (286.811825631, -365.42586936))
            ThreePointArc((286.811825631, -365.42586936), (289.515915106, -371.417982957), (288.861668487, -377.959350292))
            Line((288.861668487, -377.959350292), (268.061959257, -432.970654534))
            ThreePointArc((268.061959257, -432.970654534), (263.402407732, -438.927392133), (256.182724944, -441.179130056))
            Line((256.182724944, -441.179130056), (105.645109911, -441.179130056))
            ThreePointArc((105.645109911, -441.179130056), (93.682978455, -432.744972415), (97.609115097, -418.644864077))
            Line((97.609115097, -418.644864077), (257.464005186, -288.020670003))
        make_face(mode=Mode.SUBTRACT)
        with Locations((107.756614104, -55.879031838)):
            Circle(CONVERT_FLANGE_TO_SHEET_OUTLINE_R, mode=Mode.SUBTRACT)
        with Locations((163.635645942, -152.664354058)):
            Circle(CONVERT_FLANGE_TO_SHEET_OUTLINE_R, mode=Mode.SUBTRACT)
        with Locations((260.420968162, -208.543385896)):
            Circle(CONVERT_FLANGE_TO_SHEET_OUTLINE_R, mode=Mode.SUBTRACT)
        with Locations((316.3, -341.3)):
            Circle(CONVERT_FLANGE_TO_SHEET_OUTLINE_R_2, mode=Mode.SUBTRACT)
        with Locations((372.179031838, -208.543385896)):
            Circle(CONVERT_FLANGE_TO_SHEET_OUTLINE_R, mode=Mode.SUBTRACT)
        with Locations((316.3, 0)):
            Circle(CONVERT_FLANGE_TO_SHEET_OUTLINE_R_3, mode=Mode.SUBTRACT)
        with Locations((468.964354058, -152.664354058)):
            Circle(CONVERT_FLANGE_TO_SHEET_OUTLINE_R, mode=Mode.SUBTRACT)
        with Locations((524.843385896, -55.879031838)):
            Circle(CONVERT_FLANGE_TO_SHEET_OUTLINE_R, mode=Mode.SUBTRACT)
        with Locations((107.756614104, 55.879031838)):
            Circle(CONVERT_FLANGE_TO_SHEET_OUTLINE_R, mode=Mode.SUBTRACT)
        with Locations((163.635645942, 152.664354058)):
            Circle(CONVERT_FLANGE_TO_SHEET_OUTLINE_R, mode=Mode.SUBTRACT)
        with Locations((260.420968162, 208.543385896)):
            Circle(CONVERT_FLANGE_TO_SHEET_OUTLINE_R, mode=Mode.SUBTRACT)
        with BuildLine():
            Line((46.135994814, 395.102459099), (206.439918904, 264.111340345))
            ThreePointArc((206.439918904, 264.111340345), (210.931253322, 252.189965766), (202.817491303, 242.368656148))
            Line((202.817491303, 242.368656148), (42.513567213, 182.955883556))
            ThreePointArc((42.513567213, 182.955883556), (30.846114958, 184.439756133), (25.4, 194.864301774))
            Line((25.4, 194.864301774), (25.4, 385.26819312))
            ThreePointArc((25.4, 385.26819312), (32.65790179, 396.74310345), (46.135994814, 395.102459099))
        make_face(mode=Mode.SUBTRACT)
        with BuildLine():
            ThreePointArc((282.284462808, 358.462553119), (279.235178626, 350.120941928), (278.2, 341.3))
            Line((278.2, 341.3), (278.2, 297.854935982))
            ThreePointArc((278.2, 297.854935982), (270.94209821, 286.380025652), (257.464005186, 288.020670003))
            Line((257.464005186, 288.020670003), (49.87538072, 457.650118027))
            ThreePointArc((49.87538072, 457.650118027), (45.227339921, 466.847798927), (48.931119413, 476.464640127))
            Line((48.931119413, 476.464640127), (51.713147519, 479.246668232))
            ThreePointArc((51.713147519, 479.246668232), (58.68186852, 482.80609817), (66.414254679, 481.604924508))
            Line((66.414254679, 481.604924508), (276.666801451, 375.521916556))
            ThreePointArc((276.666801451, 375.521916556), (283.00874198, 368.155690599), (282.284462808, 358.462553119))
        make_face(mode=Mode.SUBTRACT)
        with Locations((372.179031838, 208.543385896)):
            Circle(CONVERT_FLANGE_TO_SHEET_OUTLINE_R, mode=Mode.SUBTRACT)
        with Locations((524.843385896, 55.879031838)):
            Circle(CONVERT_FLANGE_TO_SHEET_OUTLINE_R, mode=Mode.SUBTRACT)
        with Locations((468.964354058, 152.664354058)):
            Circle(CONVERT_FLANGE_TO_SHEET_OUTLINE_R, mode=Mode.SUBTRACT)
        with Locations((316.3, 341.3)):
            Circle(CONVERT_FLANGE_TO_SHEET_OUTLINE_R_2, mode=Mode.SUBTRACT)
    extrude(amount=CONVERT_FLANGE_TO_SHEET_DEPTH)


solid = Compound([body_2.part, body_3.part])
